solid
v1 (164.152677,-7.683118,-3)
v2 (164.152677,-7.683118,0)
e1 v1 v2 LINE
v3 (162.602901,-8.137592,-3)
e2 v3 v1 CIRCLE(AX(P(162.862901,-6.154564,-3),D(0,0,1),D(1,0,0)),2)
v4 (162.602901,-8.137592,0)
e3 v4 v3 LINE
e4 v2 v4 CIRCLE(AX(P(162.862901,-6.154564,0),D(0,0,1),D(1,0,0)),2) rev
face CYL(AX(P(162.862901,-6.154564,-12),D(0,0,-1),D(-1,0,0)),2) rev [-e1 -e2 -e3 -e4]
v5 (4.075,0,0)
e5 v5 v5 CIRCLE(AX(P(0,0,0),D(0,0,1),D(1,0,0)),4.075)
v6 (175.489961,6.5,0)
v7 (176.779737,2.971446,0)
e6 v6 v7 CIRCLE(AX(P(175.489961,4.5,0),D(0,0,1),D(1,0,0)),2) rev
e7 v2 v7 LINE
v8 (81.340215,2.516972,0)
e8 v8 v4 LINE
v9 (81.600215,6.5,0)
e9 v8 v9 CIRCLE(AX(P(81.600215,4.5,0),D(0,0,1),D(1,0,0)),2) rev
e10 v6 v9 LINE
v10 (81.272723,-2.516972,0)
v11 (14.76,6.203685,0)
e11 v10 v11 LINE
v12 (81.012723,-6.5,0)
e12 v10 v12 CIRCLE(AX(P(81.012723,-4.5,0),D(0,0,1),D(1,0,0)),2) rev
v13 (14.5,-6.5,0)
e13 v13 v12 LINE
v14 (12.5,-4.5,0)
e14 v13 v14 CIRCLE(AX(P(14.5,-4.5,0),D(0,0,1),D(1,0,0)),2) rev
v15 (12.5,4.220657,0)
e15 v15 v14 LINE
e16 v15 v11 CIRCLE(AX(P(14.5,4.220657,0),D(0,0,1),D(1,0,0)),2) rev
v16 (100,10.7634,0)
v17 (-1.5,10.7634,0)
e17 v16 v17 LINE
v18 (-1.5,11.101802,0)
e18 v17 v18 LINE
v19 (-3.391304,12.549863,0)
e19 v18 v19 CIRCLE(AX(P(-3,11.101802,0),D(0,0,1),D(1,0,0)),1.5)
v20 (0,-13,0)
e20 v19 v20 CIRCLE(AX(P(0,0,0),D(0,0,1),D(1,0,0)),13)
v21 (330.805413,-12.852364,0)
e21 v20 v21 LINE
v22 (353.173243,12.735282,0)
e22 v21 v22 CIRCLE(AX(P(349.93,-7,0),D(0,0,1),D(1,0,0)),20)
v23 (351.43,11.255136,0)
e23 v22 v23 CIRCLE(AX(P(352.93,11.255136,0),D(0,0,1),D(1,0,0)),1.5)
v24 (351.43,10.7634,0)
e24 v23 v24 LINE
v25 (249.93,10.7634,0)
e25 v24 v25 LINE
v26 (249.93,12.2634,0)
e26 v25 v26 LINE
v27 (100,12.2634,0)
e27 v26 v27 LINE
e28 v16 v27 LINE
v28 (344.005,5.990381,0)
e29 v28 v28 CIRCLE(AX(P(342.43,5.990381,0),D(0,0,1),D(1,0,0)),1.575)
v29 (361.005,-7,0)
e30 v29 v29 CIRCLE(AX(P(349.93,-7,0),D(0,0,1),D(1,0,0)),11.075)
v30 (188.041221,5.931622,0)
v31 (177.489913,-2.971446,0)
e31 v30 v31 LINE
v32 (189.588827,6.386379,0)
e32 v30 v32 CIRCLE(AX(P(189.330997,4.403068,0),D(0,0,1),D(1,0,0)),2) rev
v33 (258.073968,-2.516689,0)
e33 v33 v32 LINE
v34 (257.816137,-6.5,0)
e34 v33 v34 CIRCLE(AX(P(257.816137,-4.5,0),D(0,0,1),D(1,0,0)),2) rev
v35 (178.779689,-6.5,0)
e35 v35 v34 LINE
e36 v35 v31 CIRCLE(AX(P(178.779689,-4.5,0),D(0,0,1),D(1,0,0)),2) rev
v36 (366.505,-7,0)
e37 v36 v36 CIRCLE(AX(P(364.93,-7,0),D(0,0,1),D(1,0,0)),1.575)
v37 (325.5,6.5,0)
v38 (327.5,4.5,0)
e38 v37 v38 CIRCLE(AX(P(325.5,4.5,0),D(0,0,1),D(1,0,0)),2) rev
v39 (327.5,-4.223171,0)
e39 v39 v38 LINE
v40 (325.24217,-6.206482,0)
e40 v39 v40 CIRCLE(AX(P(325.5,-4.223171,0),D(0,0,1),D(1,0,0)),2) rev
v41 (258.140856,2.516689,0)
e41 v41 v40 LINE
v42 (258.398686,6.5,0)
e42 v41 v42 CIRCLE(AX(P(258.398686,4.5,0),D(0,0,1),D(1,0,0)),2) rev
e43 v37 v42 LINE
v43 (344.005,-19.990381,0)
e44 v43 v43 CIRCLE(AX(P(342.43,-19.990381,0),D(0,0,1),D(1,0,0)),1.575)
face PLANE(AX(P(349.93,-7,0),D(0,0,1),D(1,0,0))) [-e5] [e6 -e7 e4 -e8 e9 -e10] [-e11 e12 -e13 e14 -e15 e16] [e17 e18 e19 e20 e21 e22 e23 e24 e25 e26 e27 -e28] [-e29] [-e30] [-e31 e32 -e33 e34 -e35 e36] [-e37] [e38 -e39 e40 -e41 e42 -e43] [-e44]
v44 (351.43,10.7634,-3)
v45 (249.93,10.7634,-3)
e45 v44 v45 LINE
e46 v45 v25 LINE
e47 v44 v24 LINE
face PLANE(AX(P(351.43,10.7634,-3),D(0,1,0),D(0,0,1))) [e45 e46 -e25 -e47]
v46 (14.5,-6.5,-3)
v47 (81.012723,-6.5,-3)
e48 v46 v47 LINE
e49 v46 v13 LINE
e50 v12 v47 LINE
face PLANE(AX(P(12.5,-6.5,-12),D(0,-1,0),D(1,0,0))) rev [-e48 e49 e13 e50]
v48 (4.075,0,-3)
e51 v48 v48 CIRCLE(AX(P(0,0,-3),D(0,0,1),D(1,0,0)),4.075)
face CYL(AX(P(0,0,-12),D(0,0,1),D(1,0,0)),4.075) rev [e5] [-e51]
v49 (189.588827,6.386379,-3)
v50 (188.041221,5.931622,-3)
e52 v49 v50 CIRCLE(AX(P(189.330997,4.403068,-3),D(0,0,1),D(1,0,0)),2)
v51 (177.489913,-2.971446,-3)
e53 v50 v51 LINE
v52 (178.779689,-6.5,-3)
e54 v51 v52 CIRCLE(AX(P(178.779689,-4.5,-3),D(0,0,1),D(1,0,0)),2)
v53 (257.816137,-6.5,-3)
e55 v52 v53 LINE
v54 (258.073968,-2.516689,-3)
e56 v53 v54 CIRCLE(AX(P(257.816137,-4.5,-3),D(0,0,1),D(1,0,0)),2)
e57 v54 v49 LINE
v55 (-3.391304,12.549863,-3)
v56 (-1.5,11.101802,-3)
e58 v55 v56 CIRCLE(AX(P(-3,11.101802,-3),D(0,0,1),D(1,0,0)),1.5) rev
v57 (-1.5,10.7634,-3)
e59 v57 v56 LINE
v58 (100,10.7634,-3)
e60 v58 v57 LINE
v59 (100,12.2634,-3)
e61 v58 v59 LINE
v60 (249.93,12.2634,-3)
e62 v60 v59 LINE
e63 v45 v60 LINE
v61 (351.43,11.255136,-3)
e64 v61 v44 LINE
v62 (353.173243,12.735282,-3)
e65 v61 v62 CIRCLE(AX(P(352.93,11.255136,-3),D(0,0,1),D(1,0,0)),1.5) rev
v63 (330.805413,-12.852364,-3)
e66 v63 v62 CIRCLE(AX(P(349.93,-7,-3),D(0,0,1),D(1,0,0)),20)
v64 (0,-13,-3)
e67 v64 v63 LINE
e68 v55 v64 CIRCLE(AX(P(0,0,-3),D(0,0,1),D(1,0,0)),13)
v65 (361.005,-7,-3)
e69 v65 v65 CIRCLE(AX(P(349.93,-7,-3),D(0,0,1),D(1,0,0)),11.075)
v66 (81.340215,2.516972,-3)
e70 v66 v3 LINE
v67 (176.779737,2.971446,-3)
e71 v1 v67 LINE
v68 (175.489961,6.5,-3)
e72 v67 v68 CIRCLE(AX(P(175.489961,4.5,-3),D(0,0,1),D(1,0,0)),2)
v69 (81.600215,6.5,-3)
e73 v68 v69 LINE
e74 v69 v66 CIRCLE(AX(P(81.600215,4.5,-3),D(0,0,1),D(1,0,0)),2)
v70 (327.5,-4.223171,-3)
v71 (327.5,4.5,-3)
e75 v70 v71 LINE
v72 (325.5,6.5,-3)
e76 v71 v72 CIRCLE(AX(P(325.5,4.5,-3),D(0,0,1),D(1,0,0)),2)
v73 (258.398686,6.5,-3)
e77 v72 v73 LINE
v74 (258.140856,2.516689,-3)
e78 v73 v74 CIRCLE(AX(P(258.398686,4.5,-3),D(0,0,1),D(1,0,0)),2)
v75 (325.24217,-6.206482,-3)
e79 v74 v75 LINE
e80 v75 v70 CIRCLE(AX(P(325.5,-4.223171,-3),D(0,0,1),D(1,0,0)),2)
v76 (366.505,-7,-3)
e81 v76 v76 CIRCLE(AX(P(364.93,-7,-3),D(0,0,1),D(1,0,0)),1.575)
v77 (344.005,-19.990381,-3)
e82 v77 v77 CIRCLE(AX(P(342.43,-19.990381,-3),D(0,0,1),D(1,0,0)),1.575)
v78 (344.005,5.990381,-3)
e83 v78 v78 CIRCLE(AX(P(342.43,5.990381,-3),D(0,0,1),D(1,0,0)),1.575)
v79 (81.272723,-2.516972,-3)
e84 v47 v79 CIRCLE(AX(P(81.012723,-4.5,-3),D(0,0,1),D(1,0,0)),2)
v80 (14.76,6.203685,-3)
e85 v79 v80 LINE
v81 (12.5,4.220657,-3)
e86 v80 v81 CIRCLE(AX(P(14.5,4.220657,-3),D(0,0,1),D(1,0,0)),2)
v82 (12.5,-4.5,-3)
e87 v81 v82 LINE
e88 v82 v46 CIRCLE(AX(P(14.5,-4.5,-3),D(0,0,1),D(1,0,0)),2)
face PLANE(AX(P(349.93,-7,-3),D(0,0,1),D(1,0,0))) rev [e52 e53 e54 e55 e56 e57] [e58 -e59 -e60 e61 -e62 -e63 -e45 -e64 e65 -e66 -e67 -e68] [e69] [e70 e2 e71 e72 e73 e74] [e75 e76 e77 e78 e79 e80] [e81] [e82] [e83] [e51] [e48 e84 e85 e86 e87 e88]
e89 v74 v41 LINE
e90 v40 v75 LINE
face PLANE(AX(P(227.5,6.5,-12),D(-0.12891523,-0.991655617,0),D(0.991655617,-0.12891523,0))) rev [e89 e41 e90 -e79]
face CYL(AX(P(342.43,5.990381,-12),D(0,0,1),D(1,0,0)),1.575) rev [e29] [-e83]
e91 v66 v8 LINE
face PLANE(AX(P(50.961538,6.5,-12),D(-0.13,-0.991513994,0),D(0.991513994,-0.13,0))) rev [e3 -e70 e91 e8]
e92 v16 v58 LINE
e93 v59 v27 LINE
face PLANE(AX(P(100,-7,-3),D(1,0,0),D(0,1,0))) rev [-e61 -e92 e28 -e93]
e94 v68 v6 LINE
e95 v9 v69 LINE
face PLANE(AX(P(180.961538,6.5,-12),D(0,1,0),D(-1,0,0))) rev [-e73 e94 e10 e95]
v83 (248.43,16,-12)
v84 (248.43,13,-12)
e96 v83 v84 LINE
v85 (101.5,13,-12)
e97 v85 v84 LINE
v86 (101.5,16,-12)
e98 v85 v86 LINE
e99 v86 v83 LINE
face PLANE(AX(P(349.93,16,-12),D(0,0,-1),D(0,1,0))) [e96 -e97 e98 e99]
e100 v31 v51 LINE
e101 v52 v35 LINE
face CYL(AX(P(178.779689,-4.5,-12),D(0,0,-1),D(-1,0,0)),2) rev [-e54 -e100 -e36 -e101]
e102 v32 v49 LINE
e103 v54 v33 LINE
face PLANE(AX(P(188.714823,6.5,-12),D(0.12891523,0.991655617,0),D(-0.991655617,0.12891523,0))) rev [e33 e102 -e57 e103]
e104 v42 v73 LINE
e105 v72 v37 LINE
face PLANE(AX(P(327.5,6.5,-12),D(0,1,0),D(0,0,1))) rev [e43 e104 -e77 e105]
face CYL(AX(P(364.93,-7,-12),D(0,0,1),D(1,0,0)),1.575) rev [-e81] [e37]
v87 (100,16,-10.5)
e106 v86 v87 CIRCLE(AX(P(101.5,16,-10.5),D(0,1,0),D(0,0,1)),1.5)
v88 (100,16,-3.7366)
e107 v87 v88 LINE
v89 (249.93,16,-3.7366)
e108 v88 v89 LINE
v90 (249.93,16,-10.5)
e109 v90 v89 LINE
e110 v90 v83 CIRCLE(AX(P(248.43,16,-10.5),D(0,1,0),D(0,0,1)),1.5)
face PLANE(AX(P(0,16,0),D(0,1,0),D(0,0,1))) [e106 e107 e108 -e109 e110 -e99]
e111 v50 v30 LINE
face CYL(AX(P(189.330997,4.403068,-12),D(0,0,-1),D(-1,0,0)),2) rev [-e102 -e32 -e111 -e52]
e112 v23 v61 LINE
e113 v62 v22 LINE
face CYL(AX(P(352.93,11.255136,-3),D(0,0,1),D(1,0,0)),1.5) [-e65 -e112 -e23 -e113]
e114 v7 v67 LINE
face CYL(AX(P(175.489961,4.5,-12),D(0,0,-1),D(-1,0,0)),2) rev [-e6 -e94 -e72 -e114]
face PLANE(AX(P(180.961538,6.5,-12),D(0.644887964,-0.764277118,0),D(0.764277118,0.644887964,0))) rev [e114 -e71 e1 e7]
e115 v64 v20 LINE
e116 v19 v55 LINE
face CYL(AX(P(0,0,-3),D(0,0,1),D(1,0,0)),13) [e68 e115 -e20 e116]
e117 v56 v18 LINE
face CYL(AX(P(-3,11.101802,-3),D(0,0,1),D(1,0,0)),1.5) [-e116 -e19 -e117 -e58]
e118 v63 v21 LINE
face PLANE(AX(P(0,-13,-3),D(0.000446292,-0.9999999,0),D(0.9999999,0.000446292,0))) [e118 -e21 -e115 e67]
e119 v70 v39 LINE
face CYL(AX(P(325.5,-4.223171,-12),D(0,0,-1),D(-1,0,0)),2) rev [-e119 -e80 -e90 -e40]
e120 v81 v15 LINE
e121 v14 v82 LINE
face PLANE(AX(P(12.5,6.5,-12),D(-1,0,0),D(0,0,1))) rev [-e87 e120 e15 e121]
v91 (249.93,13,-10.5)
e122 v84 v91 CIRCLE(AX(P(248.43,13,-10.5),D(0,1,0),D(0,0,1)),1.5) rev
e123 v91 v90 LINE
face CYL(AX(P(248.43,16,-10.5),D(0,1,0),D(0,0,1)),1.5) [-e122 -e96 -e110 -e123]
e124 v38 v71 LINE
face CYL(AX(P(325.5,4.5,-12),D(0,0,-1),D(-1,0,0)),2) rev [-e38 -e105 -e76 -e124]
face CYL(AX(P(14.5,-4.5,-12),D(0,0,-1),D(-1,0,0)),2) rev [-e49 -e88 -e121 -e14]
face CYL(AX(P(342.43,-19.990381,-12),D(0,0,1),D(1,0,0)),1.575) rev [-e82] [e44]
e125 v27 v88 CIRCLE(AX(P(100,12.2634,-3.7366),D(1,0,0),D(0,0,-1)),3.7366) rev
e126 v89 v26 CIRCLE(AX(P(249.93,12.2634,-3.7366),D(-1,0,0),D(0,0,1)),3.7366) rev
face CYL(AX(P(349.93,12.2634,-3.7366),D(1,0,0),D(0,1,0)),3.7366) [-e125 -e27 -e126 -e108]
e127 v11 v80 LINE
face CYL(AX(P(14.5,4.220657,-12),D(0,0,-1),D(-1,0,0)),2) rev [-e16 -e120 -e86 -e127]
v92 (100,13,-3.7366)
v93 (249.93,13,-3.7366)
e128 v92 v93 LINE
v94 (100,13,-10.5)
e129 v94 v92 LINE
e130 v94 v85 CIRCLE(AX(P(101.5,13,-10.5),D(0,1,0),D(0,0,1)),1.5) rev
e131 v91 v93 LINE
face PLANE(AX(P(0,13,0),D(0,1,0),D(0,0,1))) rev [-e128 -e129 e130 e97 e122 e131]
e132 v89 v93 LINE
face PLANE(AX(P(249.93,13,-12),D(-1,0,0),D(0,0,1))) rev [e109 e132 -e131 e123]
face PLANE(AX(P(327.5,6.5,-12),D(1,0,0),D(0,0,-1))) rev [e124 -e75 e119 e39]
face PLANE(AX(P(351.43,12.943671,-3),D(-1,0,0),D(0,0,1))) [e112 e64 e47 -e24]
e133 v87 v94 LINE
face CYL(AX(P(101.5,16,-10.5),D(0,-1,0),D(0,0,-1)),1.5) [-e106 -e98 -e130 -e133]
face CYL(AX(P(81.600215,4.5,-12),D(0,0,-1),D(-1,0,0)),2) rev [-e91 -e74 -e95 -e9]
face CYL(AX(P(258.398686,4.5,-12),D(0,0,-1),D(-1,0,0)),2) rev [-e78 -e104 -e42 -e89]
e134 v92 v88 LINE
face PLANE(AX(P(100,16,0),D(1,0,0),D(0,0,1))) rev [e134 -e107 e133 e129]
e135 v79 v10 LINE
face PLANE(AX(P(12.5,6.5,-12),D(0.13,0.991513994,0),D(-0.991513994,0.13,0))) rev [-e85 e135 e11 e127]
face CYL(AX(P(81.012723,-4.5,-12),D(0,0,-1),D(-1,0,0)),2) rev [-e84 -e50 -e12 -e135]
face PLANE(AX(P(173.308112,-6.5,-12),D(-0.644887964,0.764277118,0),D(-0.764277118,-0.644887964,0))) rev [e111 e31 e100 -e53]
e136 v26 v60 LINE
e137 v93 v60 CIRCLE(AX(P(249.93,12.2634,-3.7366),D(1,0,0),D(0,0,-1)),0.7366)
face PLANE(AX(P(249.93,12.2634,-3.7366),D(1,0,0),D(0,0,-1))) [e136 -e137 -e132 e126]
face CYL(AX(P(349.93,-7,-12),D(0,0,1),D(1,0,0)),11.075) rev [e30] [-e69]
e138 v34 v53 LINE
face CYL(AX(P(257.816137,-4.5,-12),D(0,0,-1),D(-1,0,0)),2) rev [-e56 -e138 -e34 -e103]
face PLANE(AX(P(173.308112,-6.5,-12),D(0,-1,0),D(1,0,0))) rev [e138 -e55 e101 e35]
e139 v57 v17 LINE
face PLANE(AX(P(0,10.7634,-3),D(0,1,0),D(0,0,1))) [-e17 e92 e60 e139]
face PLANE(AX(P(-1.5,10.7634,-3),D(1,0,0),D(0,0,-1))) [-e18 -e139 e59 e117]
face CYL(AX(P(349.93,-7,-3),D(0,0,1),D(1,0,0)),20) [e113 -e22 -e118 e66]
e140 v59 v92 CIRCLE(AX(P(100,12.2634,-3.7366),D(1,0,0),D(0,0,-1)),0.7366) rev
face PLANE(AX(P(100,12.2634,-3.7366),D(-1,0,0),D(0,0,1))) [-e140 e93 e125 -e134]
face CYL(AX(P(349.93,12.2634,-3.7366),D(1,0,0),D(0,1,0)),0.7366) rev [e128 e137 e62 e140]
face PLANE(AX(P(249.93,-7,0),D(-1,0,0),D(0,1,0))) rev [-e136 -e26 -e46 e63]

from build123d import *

# Parameters (mm, degrees)
BASE_FLANGE1_DEPTH            = 3
EDGE_FLANGE2_STRIP_W          = 13.4732
EDGE_FLANGE2_STRIP_H          = 3
EDGE_FLANGE2_STRIP_CUT_DEPTH  = 349.93
EDGE_FLANGE2_RELIEF_W         = 14.9732
EDGE_FLANGE2_RELIEF_H         = 1.5
EDGE_FLANGE2_RELIEF_CUT_DEPTH = 3
EDGE_FLANGE2_DEPTH            = 349.93
CUT_EXTRUDE1_DEPTH            = 372.108077115
CUT_EXTRUDE1_DEPTH_BACK       = 372.108077115
SKETCH22_R                    = 4.075
SKETCH22_R_2                  = 11.075
SKETCH22_R_3                  = 1.575
CUT_EXTRUDE2_DEPTH            = 372.108077115
CUT_EXTRUDE2_DEPTH_BACK       = 372.108077115
FILLET1_R                     = 2
CUT_EXTRUDE3_DEPTH            = 372.108077115
CUT_EXTRUDE3_DEPTH_BACK       = 372.108077115
SKETCH24_W                    = 100
SKETCH24_H                    = 5.2366
FILLET2_R                     = 1.5


# Sheet-metal steps are written as plain solids
with BuildPart() as part:
    # Sketch1 → Base-Flange1 (new body)
    with BuildSketch(Plane.XY):
        with BuildLine():
            Line((0, 13), (349.93, 13))
            ThreePointArc((349.93, 13), (366.008670386, -18.89438349), (330.805412842, -12.852364139))
            Line((330.805412842, -12.852364139), (0, -13))
            ThreePointArc((0, -13), (-13, 0), (0, 13))
        make_face()
    extrude(amount=-BASE_FLANGE1_DEPTH)

    # Edge-Flange2 strip (across the edge) → Edge-Flange2 strip cut (cut)
    with BuildSketch(Plane(origin=(0, 13, -3), x_dir=(0, -1, 0), z_dir=(1, 0, 0))):
        with Locations((-6, -1.5)):
            Rectangle(EDGE_FLANGE2_STRIP_W, EDGE_FLANGE2_STRIP_H)
    extrude(amount=EDGE_FLANGE2_STRIP_CUT_DEPTH, mode=Mode.SUBTRACT)

    # Edge-Flange2 relief (on the sheet) → Edge-Flange2 relief cut (cut)
    with BuildSketch(Plane(origin=(0, 12.2634, -3), x_dir=(0, -1, 0), z_dir=(0, 0, -1))):
        with Locations((-5.9866, 0.75)):
            Rectangle(EDGE_FLANGE2_RELIEF_W, EDGE_FLANGE2_RELIEF_H)
        with Locations((-5.9866, -350.68)):
            Rectangle(EDGE_FLANGE2_RELIEF_W, EDGE_FLANGE2_RELIEF_H)
    extrude(amount=-EDGE_FLANGE2_RELIEF_CUT_DEPTH, mode=Mode.SUBTRACT)

    # Edge-Flange2 section (across the edge) → Edge-Flange2 (add)
    with BuildSketch(Plane(origin=(0, 13, -3), x_dir=(0, -1, 0), z_dir=(1, 0, 0))):
        with BuildLine():
            Line((-3, 0.7366), (-3, 9))
            Line((-3, 9), (0, 9))
            Line((0, 9), (0, 0.7366))
            ThreePointArc((0, 0.7366), (0.215745145, 0.215745145), (0.7366, 0))
            Line((0.7366, 0), (0.7366, -3))
            ThreePointArc((0.7366, -3), (-1.905575199, -1.905575199), (-3, 0.7366))
        make_face()
    extrude(amount=EDGE_FLANGE2_DEPTH)

    # Sketch22 → Cut-Extrude1 (cut, two sides: drawn at the far end of the back side and taken through both)
    with BuildSketch(Plane.XY.offset(-CUT_EXTRUDE1_DEPTH_BACK)):
        Circle(SKETCH22_R)
        with Locations((349.93, -7)):
            Circle(SKETCH22_R_2)
        with Locations((364.93, -7)):
            Circle(SKETCH22_R_3)
        with Locations((342.43, 5.990381057)):
            Circle(SKETCH22_R_3)
        with Locations((342.43, -19.990381057)):
            Circle(SKETCH22_R_3)
    extrude(amount=CUT_EXTRUDE1_DEPTH + CUT_EXTRUDE1_DEPTH_BACK, mode=Mode.SUBTRACT)

    # Sketch23 → Cut-Extrude2 (cut, two sides: drawn at the far end of the back side and taken through both)
    with BuildSketch(Plane.XY.offset(-CUT_EXTRUDE2_DEPTH_BACK)):
        Polygon((12.5, 6.5), (12.5, -6.5), (111.651399385, -6.5), align=None)
        Polygon((327.5, 6.5), (227.5, 6.5), (327.5, -6.5), align=None)
        Polygon((50.961538462, 6.5), (163.478075869, -8.252338296), (180.961538462, 6.5), align=None)
        Polygon((173.308112114, -6.5), (288.714823182, -6.5), (188.714823182, 6.5), align=None)
    extrude(amount=CUT_EXTRUDE2_DEPTH + CUT_EXTRUDE2_DEPTH_BACK, mode=Mode.SUBTRACT)

    # Fillet1
    fillet1_edges = [part.edges().sort_by_distance(p)[0] for p in [
        (12.5, 6.5, -1.5),
        (288.714823182, -6.5, -1.5),
        (173.308112114, -6.5, -1.5),
        (188.714823182, 6.5, -1.5),
        (163.478075869, -8.252338296, -1.5),
        (50.961538462, 6.5, -1.5),
        (180.961538462, 6.5, -1.5),
        (227.5, 6.5, -1.5),
        (0, 14.5, -12),
        (349.93, 14.5, -12),
        (327.5, -6.5, -1.5),
        (327.5, 6.5, -1.5),
        (111.651399385, -6.5, -1.5),
        (12.5, -6.5, -1.5),
    ]]
    fillet(fillet1_edges, radius=FILLET1_R)

    # Sketch24 → Cut-Extrude3 (cut, two sides: drawn at the far end of the back side and taken through both)
    with BuildSketch(Plane.XY.offset(-CUT_EXTRUDE3_DEPTH_BACK)):
        with Locations((50, 13.3817)):
            Rectangle(SKETCH24_W, SKETCH24_H)
        with Locations((299.93, 13.3817)):
            Rectangle(SKETCH24_W, SKETCH24_H)
    extrude(amount=CUT_EXTRUDE3_DEPTH + CUT_EXTRUDE3_DEPTH_BACK, mode=Mode.SUBTRACT)

    # Fillet2
    fillet2_edges = [part.edges().sort_by_distance(p)[0] for p in [
        (351.43, 12.943670675, -1.5),
        (-1.5, 12.91317157, -1.5),
        (100, 14.5, -12),
        (249.93, 14.5, -12),
    ]]
    fillet(fillet2_edges, radius=FILLET2_R)


solid = part.part
